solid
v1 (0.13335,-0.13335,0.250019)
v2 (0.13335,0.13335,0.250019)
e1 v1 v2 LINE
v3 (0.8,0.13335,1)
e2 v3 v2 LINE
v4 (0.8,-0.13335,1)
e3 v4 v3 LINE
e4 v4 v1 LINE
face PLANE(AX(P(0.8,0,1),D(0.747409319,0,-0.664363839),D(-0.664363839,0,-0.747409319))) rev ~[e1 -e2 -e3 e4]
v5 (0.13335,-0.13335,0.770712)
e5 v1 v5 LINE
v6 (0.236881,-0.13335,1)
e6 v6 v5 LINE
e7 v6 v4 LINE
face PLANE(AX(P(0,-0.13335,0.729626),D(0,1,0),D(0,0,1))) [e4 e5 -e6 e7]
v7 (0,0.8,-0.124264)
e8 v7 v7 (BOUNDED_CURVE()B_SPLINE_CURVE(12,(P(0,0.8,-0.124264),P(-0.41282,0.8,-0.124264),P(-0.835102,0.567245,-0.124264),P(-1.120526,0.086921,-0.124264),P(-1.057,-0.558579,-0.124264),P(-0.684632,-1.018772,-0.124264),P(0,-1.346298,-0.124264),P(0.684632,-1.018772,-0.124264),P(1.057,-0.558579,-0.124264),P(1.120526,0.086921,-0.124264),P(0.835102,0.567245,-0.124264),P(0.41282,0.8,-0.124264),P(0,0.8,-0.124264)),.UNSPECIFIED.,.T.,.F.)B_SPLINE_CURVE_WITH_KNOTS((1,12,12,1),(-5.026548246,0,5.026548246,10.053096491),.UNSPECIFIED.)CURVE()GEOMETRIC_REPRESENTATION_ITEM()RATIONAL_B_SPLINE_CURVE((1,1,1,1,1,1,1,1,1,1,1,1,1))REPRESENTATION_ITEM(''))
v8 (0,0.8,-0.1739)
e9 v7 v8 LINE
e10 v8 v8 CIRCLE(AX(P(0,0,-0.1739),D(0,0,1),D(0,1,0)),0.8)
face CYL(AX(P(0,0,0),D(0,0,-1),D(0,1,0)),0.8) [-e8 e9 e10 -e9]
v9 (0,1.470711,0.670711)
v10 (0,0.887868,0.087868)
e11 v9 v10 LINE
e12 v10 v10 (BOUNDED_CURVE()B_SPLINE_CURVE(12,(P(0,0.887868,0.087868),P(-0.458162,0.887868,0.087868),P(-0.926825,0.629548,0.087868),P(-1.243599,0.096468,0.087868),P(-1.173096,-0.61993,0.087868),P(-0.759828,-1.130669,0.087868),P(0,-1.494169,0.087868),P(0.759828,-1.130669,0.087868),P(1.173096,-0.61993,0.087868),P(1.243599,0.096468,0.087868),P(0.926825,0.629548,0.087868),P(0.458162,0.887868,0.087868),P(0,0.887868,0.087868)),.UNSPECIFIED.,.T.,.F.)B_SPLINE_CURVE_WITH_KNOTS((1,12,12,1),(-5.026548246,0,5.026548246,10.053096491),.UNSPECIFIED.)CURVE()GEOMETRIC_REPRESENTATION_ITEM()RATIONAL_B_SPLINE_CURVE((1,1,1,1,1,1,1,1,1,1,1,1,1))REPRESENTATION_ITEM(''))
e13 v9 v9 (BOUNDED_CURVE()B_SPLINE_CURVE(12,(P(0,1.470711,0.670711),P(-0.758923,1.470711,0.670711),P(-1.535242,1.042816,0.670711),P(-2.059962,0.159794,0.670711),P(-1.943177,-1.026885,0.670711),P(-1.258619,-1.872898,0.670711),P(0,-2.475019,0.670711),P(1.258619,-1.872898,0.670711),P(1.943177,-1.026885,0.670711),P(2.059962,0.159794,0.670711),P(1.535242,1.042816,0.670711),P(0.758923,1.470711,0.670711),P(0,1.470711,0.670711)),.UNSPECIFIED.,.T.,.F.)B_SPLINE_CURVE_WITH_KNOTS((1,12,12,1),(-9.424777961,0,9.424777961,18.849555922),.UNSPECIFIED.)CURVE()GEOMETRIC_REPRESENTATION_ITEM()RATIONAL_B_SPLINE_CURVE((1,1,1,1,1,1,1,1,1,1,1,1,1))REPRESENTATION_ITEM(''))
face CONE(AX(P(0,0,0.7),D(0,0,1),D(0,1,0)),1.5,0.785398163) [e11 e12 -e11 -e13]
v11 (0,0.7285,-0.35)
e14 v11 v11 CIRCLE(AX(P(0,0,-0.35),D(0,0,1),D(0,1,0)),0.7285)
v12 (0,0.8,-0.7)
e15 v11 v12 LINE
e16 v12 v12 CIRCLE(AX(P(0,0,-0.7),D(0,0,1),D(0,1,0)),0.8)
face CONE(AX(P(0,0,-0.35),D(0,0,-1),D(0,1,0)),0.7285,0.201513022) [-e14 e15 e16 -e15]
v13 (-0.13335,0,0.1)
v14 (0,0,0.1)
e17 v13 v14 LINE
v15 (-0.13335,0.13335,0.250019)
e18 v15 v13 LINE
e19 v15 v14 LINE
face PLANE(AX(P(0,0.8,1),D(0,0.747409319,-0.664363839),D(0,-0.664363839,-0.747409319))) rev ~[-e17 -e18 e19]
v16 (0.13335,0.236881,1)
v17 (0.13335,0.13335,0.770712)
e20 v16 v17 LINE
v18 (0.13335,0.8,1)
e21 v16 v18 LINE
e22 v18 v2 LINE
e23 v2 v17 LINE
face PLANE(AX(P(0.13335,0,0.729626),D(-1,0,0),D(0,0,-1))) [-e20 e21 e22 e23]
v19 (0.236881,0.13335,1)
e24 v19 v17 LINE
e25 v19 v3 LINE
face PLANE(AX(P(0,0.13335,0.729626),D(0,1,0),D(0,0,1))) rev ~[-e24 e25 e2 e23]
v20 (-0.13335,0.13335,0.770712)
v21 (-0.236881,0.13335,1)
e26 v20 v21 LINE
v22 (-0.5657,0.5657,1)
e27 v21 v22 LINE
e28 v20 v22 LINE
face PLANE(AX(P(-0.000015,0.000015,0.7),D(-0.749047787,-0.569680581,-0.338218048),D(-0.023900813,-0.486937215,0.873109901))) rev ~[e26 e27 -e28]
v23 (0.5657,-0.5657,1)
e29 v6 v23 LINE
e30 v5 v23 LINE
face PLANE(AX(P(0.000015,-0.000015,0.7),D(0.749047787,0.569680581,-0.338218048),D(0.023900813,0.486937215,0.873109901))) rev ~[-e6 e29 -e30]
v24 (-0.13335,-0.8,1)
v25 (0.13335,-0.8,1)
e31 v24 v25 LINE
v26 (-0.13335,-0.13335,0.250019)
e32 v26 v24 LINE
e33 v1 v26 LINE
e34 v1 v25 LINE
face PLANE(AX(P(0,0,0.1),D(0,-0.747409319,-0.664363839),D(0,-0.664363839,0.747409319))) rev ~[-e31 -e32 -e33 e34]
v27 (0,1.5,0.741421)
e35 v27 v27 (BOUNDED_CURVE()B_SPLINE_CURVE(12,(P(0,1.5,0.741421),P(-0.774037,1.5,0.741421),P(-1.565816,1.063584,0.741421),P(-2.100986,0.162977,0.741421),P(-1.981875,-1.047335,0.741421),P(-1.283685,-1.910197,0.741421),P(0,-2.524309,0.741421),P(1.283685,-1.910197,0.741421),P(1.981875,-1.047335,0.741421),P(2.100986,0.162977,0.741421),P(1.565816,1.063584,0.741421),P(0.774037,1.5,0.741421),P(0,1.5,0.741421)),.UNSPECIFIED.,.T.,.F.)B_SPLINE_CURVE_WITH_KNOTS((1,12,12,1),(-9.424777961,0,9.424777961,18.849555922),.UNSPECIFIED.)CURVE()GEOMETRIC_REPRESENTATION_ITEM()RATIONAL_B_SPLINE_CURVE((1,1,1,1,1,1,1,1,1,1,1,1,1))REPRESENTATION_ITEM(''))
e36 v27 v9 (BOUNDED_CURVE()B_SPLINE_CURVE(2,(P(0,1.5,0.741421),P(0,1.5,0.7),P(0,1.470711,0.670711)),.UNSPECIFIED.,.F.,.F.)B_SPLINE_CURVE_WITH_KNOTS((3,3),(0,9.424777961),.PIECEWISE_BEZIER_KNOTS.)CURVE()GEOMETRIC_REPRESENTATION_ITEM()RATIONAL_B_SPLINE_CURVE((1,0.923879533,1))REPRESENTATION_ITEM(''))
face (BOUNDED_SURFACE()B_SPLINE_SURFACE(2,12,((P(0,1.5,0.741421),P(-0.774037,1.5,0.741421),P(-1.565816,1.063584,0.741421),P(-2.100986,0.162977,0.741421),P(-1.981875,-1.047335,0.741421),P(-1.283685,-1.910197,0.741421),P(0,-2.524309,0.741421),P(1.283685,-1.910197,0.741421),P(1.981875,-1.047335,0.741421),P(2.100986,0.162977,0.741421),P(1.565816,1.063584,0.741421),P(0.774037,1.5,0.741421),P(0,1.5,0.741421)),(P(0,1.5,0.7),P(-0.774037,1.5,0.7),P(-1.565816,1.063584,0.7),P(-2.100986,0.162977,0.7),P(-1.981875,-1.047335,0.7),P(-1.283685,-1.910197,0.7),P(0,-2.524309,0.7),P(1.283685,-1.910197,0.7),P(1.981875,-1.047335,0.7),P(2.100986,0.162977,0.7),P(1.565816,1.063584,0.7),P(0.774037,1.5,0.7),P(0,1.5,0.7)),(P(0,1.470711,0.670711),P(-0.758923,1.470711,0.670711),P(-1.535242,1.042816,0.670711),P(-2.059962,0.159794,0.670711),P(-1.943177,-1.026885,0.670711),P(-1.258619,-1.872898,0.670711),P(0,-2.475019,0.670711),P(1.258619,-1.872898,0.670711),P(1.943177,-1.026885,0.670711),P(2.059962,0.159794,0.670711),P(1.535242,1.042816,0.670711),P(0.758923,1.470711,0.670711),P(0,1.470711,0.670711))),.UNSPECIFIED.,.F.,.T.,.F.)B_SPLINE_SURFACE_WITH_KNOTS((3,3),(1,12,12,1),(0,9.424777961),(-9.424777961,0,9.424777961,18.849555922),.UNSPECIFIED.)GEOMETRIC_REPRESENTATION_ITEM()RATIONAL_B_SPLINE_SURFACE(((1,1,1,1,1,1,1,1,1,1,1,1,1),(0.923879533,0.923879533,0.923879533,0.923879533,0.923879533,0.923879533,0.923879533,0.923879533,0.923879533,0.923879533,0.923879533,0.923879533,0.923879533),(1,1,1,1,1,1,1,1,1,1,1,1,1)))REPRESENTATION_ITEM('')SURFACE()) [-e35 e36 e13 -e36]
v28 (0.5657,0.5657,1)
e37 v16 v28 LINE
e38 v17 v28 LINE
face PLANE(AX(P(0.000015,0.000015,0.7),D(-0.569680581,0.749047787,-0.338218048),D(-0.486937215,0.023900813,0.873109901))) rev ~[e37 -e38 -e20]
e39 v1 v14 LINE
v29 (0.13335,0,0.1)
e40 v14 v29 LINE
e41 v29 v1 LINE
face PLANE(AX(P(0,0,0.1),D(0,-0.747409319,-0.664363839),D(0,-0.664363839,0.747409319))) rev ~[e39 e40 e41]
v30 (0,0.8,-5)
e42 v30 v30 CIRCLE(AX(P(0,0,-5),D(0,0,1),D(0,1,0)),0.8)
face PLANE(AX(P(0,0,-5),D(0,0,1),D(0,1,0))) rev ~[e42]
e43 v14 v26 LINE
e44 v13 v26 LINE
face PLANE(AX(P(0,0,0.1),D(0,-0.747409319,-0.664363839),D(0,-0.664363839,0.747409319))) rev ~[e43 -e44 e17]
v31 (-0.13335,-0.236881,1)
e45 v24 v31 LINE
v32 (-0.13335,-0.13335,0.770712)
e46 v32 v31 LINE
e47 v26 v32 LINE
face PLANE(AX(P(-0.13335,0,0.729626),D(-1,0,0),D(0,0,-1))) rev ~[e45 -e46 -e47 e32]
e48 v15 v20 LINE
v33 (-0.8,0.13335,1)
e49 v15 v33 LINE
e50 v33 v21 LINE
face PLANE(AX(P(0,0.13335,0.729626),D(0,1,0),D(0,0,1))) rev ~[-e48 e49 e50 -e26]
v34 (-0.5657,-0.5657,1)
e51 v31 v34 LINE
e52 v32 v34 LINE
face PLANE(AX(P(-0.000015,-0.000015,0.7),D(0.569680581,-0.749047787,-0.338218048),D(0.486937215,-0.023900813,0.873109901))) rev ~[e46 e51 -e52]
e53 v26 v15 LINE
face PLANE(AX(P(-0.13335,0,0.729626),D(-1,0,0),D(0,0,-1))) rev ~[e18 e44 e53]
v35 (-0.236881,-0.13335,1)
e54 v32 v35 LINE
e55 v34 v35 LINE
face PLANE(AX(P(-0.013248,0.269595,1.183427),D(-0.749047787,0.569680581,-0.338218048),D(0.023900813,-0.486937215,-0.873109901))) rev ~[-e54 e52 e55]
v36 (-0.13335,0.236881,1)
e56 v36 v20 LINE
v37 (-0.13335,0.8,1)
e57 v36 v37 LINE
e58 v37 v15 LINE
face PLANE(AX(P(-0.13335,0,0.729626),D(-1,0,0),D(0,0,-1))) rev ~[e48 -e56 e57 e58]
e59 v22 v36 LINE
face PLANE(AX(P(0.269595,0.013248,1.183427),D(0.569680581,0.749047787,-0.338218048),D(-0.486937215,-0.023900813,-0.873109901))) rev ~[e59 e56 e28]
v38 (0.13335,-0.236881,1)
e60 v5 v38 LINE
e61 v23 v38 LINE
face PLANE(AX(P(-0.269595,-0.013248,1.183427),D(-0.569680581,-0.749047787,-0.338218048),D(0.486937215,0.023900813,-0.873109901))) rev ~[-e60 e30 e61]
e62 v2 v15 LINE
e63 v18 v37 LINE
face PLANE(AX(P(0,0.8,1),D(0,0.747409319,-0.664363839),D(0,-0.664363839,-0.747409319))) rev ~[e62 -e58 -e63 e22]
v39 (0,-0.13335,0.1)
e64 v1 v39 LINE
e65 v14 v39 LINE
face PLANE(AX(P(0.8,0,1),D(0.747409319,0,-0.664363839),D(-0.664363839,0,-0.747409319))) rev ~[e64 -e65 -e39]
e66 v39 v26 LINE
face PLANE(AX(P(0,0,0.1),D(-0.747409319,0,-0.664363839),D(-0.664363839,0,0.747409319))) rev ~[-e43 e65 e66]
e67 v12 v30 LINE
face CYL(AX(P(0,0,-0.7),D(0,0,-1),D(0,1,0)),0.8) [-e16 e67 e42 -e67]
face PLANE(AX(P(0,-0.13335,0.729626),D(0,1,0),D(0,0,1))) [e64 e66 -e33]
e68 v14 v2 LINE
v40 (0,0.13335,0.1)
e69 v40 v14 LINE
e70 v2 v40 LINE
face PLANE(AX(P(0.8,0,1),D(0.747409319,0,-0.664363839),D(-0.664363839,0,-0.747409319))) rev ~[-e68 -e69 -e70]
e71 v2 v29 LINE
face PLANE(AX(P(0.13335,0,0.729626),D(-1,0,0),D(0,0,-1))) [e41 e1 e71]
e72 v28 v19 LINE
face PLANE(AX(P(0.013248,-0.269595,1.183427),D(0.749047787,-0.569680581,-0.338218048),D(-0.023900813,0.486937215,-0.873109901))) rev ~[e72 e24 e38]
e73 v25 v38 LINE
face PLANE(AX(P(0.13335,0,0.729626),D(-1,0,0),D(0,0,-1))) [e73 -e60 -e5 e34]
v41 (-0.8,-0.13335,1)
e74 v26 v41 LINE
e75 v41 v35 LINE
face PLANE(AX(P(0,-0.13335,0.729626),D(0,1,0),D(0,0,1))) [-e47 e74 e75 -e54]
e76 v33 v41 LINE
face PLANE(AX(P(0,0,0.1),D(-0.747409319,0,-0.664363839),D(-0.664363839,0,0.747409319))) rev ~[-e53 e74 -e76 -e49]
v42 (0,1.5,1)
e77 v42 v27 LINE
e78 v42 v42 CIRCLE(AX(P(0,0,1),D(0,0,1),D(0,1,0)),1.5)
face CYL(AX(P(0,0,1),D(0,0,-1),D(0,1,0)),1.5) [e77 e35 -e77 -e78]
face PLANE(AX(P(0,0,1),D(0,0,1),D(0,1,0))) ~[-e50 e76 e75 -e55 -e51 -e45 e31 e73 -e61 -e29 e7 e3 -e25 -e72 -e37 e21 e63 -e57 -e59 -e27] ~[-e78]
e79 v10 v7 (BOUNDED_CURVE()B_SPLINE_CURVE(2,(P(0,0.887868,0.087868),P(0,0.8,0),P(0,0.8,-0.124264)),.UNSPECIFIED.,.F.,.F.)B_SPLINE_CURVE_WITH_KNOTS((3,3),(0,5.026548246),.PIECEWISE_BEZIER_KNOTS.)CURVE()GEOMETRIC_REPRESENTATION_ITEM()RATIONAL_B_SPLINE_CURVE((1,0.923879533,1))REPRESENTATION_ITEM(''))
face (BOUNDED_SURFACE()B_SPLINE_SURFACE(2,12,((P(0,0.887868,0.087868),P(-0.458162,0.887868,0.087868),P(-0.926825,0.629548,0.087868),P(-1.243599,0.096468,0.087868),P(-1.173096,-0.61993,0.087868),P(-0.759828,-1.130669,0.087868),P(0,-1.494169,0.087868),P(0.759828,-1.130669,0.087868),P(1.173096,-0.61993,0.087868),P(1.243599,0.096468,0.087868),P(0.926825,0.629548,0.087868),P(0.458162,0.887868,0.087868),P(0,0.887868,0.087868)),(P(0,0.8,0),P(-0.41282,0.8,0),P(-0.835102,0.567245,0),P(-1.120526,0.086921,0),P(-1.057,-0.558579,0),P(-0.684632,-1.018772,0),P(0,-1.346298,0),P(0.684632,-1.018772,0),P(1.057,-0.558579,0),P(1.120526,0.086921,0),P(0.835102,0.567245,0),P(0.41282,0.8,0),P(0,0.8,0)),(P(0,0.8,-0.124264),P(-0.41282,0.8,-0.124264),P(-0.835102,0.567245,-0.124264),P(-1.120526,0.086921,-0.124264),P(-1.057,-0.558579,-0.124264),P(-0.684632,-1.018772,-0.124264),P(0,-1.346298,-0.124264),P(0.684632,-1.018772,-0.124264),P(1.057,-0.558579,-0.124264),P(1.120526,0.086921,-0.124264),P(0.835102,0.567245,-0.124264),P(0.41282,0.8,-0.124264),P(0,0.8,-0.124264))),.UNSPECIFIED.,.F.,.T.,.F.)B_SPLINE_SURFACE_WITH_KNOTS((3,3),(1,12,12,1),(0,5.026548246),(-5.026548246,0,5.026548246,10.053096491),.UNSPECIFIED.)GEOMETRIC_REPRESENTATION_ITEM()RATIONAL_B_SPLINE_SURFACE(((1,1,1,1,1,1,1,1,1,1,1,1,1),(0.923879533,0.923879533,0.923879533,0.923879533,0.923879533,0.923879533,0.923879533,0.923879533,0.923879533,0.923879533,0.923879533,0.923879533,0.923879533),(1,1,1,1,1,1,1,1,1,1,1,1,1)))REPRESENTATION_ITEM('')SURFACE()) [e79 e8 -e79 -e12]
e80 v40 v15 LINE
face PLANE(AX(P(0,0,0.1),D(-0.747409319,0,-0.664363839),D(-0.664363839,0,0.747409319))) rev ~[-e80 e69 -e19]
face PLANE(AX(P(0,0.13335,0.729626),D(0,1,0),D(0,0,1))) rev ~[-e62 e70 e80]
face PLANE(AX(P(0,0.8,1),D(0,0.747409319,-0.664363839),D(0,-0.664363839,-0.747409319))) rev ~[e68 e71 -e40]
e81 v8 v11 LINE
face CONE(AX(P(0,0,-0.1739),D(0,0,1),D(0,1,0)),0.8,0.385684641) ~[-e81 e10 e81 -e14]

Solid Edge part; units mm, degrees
sketch "Sketch1" plane through (0, 0, 0) normal (1, 0, 0) x (0, 1, 0)
  line L0 (0, 1) -> (1.5, 1)
  line L1 (1.5, 1) -> (1.5, 0.7)
  line L2 (1.5, 0.7) -> (0.8, 0)
  line L3 (0.8, 0) -> (0.8, -0.1739)
  line L4 (0.8, -0.1739) -> (0.7285, -0.35)
  line L5 (0.7285, -0.35) -> (0.8, -0.7)
  line L6 (0.8, -0.7) -> (0.8, -5)
  line L7 (0.8, -5) -> (0, -5)
  dimension "D1" = 6
  dimension "D2" = 1
  dimension "D3" = 1.5
  dimension "D4" = 0.8
  dimension "D5" = 0.35
  dimension "D6" = 0.7
  dimension "D7" = 0.1739
revolve "RevolvedProtrusion1" add sketch "Sketch1" angle 360 about axis through (0, 0, -1.8) along (0, 0, 1)
fillet "Round1" radius 0.1 1 edges at (-1.5, 0, 0.7)
fillet "Round2" radius 0.3 1 edges at (-0.8, 0, 0)
cosmetic_thread "Thread1" size "M1.6"
sketch "Sketch2" plane through (0, 0, 0) normal (0, -1, 0) x (1, 0, 0)
  line L0 (-0.8, 1) -> (0.8, 1)
  line L1 (0.8, 1) -> (0, 0.1)
  line L2 (0, 0.1) -> (-0.8, 1)
extrude "Cutout1" cut sketch "Sketch2" along normal mid plane 0.2667
sketch "Sketch3" plane through (0, 0, 0) normal (1, 0, 0) x (0, 1, 0)
  line L0 (-0.8, 1) -> (0.8, 1)
  line L1 (0.8, 1) -> (0, 0.1)
  line L2 (0, 0.1) -> (-0.8, 1)
extrude "Cutout2" cut sketch "Sketch3" along normal mid plane 0.2667
sketch "Sketch4" plane through (0, 0, 0) normal (-0.7071068, -0.7071068, 0) x (0, 0, -1)
  line L0 (-0.7, 0) -> (-1, -0.8)
sketch "Sketch5" plane through (-0.5657, 0.5657, 1) normal (-0.6620847, 0.6620847, 0.3511234) x (-0.2482818, 0.2482818, -0.9363292)
  line L0 (0, 0) -> (-0.5163, 0.2)
  line L1 (-0.5163, 0.2) -> (-0.5163, -0.2)
  line L2 (-0.5163, -0.2) -> (0, 0)
sweep "SweptCutout1" cut profiles "Sketch5" path "Sketch4"
pattern_circular "Pattern1" count 4 over 360 about axis through (0, 0, 0) along (0, 0, -1) of "SweptCutout1"
properties material "Stahl"
